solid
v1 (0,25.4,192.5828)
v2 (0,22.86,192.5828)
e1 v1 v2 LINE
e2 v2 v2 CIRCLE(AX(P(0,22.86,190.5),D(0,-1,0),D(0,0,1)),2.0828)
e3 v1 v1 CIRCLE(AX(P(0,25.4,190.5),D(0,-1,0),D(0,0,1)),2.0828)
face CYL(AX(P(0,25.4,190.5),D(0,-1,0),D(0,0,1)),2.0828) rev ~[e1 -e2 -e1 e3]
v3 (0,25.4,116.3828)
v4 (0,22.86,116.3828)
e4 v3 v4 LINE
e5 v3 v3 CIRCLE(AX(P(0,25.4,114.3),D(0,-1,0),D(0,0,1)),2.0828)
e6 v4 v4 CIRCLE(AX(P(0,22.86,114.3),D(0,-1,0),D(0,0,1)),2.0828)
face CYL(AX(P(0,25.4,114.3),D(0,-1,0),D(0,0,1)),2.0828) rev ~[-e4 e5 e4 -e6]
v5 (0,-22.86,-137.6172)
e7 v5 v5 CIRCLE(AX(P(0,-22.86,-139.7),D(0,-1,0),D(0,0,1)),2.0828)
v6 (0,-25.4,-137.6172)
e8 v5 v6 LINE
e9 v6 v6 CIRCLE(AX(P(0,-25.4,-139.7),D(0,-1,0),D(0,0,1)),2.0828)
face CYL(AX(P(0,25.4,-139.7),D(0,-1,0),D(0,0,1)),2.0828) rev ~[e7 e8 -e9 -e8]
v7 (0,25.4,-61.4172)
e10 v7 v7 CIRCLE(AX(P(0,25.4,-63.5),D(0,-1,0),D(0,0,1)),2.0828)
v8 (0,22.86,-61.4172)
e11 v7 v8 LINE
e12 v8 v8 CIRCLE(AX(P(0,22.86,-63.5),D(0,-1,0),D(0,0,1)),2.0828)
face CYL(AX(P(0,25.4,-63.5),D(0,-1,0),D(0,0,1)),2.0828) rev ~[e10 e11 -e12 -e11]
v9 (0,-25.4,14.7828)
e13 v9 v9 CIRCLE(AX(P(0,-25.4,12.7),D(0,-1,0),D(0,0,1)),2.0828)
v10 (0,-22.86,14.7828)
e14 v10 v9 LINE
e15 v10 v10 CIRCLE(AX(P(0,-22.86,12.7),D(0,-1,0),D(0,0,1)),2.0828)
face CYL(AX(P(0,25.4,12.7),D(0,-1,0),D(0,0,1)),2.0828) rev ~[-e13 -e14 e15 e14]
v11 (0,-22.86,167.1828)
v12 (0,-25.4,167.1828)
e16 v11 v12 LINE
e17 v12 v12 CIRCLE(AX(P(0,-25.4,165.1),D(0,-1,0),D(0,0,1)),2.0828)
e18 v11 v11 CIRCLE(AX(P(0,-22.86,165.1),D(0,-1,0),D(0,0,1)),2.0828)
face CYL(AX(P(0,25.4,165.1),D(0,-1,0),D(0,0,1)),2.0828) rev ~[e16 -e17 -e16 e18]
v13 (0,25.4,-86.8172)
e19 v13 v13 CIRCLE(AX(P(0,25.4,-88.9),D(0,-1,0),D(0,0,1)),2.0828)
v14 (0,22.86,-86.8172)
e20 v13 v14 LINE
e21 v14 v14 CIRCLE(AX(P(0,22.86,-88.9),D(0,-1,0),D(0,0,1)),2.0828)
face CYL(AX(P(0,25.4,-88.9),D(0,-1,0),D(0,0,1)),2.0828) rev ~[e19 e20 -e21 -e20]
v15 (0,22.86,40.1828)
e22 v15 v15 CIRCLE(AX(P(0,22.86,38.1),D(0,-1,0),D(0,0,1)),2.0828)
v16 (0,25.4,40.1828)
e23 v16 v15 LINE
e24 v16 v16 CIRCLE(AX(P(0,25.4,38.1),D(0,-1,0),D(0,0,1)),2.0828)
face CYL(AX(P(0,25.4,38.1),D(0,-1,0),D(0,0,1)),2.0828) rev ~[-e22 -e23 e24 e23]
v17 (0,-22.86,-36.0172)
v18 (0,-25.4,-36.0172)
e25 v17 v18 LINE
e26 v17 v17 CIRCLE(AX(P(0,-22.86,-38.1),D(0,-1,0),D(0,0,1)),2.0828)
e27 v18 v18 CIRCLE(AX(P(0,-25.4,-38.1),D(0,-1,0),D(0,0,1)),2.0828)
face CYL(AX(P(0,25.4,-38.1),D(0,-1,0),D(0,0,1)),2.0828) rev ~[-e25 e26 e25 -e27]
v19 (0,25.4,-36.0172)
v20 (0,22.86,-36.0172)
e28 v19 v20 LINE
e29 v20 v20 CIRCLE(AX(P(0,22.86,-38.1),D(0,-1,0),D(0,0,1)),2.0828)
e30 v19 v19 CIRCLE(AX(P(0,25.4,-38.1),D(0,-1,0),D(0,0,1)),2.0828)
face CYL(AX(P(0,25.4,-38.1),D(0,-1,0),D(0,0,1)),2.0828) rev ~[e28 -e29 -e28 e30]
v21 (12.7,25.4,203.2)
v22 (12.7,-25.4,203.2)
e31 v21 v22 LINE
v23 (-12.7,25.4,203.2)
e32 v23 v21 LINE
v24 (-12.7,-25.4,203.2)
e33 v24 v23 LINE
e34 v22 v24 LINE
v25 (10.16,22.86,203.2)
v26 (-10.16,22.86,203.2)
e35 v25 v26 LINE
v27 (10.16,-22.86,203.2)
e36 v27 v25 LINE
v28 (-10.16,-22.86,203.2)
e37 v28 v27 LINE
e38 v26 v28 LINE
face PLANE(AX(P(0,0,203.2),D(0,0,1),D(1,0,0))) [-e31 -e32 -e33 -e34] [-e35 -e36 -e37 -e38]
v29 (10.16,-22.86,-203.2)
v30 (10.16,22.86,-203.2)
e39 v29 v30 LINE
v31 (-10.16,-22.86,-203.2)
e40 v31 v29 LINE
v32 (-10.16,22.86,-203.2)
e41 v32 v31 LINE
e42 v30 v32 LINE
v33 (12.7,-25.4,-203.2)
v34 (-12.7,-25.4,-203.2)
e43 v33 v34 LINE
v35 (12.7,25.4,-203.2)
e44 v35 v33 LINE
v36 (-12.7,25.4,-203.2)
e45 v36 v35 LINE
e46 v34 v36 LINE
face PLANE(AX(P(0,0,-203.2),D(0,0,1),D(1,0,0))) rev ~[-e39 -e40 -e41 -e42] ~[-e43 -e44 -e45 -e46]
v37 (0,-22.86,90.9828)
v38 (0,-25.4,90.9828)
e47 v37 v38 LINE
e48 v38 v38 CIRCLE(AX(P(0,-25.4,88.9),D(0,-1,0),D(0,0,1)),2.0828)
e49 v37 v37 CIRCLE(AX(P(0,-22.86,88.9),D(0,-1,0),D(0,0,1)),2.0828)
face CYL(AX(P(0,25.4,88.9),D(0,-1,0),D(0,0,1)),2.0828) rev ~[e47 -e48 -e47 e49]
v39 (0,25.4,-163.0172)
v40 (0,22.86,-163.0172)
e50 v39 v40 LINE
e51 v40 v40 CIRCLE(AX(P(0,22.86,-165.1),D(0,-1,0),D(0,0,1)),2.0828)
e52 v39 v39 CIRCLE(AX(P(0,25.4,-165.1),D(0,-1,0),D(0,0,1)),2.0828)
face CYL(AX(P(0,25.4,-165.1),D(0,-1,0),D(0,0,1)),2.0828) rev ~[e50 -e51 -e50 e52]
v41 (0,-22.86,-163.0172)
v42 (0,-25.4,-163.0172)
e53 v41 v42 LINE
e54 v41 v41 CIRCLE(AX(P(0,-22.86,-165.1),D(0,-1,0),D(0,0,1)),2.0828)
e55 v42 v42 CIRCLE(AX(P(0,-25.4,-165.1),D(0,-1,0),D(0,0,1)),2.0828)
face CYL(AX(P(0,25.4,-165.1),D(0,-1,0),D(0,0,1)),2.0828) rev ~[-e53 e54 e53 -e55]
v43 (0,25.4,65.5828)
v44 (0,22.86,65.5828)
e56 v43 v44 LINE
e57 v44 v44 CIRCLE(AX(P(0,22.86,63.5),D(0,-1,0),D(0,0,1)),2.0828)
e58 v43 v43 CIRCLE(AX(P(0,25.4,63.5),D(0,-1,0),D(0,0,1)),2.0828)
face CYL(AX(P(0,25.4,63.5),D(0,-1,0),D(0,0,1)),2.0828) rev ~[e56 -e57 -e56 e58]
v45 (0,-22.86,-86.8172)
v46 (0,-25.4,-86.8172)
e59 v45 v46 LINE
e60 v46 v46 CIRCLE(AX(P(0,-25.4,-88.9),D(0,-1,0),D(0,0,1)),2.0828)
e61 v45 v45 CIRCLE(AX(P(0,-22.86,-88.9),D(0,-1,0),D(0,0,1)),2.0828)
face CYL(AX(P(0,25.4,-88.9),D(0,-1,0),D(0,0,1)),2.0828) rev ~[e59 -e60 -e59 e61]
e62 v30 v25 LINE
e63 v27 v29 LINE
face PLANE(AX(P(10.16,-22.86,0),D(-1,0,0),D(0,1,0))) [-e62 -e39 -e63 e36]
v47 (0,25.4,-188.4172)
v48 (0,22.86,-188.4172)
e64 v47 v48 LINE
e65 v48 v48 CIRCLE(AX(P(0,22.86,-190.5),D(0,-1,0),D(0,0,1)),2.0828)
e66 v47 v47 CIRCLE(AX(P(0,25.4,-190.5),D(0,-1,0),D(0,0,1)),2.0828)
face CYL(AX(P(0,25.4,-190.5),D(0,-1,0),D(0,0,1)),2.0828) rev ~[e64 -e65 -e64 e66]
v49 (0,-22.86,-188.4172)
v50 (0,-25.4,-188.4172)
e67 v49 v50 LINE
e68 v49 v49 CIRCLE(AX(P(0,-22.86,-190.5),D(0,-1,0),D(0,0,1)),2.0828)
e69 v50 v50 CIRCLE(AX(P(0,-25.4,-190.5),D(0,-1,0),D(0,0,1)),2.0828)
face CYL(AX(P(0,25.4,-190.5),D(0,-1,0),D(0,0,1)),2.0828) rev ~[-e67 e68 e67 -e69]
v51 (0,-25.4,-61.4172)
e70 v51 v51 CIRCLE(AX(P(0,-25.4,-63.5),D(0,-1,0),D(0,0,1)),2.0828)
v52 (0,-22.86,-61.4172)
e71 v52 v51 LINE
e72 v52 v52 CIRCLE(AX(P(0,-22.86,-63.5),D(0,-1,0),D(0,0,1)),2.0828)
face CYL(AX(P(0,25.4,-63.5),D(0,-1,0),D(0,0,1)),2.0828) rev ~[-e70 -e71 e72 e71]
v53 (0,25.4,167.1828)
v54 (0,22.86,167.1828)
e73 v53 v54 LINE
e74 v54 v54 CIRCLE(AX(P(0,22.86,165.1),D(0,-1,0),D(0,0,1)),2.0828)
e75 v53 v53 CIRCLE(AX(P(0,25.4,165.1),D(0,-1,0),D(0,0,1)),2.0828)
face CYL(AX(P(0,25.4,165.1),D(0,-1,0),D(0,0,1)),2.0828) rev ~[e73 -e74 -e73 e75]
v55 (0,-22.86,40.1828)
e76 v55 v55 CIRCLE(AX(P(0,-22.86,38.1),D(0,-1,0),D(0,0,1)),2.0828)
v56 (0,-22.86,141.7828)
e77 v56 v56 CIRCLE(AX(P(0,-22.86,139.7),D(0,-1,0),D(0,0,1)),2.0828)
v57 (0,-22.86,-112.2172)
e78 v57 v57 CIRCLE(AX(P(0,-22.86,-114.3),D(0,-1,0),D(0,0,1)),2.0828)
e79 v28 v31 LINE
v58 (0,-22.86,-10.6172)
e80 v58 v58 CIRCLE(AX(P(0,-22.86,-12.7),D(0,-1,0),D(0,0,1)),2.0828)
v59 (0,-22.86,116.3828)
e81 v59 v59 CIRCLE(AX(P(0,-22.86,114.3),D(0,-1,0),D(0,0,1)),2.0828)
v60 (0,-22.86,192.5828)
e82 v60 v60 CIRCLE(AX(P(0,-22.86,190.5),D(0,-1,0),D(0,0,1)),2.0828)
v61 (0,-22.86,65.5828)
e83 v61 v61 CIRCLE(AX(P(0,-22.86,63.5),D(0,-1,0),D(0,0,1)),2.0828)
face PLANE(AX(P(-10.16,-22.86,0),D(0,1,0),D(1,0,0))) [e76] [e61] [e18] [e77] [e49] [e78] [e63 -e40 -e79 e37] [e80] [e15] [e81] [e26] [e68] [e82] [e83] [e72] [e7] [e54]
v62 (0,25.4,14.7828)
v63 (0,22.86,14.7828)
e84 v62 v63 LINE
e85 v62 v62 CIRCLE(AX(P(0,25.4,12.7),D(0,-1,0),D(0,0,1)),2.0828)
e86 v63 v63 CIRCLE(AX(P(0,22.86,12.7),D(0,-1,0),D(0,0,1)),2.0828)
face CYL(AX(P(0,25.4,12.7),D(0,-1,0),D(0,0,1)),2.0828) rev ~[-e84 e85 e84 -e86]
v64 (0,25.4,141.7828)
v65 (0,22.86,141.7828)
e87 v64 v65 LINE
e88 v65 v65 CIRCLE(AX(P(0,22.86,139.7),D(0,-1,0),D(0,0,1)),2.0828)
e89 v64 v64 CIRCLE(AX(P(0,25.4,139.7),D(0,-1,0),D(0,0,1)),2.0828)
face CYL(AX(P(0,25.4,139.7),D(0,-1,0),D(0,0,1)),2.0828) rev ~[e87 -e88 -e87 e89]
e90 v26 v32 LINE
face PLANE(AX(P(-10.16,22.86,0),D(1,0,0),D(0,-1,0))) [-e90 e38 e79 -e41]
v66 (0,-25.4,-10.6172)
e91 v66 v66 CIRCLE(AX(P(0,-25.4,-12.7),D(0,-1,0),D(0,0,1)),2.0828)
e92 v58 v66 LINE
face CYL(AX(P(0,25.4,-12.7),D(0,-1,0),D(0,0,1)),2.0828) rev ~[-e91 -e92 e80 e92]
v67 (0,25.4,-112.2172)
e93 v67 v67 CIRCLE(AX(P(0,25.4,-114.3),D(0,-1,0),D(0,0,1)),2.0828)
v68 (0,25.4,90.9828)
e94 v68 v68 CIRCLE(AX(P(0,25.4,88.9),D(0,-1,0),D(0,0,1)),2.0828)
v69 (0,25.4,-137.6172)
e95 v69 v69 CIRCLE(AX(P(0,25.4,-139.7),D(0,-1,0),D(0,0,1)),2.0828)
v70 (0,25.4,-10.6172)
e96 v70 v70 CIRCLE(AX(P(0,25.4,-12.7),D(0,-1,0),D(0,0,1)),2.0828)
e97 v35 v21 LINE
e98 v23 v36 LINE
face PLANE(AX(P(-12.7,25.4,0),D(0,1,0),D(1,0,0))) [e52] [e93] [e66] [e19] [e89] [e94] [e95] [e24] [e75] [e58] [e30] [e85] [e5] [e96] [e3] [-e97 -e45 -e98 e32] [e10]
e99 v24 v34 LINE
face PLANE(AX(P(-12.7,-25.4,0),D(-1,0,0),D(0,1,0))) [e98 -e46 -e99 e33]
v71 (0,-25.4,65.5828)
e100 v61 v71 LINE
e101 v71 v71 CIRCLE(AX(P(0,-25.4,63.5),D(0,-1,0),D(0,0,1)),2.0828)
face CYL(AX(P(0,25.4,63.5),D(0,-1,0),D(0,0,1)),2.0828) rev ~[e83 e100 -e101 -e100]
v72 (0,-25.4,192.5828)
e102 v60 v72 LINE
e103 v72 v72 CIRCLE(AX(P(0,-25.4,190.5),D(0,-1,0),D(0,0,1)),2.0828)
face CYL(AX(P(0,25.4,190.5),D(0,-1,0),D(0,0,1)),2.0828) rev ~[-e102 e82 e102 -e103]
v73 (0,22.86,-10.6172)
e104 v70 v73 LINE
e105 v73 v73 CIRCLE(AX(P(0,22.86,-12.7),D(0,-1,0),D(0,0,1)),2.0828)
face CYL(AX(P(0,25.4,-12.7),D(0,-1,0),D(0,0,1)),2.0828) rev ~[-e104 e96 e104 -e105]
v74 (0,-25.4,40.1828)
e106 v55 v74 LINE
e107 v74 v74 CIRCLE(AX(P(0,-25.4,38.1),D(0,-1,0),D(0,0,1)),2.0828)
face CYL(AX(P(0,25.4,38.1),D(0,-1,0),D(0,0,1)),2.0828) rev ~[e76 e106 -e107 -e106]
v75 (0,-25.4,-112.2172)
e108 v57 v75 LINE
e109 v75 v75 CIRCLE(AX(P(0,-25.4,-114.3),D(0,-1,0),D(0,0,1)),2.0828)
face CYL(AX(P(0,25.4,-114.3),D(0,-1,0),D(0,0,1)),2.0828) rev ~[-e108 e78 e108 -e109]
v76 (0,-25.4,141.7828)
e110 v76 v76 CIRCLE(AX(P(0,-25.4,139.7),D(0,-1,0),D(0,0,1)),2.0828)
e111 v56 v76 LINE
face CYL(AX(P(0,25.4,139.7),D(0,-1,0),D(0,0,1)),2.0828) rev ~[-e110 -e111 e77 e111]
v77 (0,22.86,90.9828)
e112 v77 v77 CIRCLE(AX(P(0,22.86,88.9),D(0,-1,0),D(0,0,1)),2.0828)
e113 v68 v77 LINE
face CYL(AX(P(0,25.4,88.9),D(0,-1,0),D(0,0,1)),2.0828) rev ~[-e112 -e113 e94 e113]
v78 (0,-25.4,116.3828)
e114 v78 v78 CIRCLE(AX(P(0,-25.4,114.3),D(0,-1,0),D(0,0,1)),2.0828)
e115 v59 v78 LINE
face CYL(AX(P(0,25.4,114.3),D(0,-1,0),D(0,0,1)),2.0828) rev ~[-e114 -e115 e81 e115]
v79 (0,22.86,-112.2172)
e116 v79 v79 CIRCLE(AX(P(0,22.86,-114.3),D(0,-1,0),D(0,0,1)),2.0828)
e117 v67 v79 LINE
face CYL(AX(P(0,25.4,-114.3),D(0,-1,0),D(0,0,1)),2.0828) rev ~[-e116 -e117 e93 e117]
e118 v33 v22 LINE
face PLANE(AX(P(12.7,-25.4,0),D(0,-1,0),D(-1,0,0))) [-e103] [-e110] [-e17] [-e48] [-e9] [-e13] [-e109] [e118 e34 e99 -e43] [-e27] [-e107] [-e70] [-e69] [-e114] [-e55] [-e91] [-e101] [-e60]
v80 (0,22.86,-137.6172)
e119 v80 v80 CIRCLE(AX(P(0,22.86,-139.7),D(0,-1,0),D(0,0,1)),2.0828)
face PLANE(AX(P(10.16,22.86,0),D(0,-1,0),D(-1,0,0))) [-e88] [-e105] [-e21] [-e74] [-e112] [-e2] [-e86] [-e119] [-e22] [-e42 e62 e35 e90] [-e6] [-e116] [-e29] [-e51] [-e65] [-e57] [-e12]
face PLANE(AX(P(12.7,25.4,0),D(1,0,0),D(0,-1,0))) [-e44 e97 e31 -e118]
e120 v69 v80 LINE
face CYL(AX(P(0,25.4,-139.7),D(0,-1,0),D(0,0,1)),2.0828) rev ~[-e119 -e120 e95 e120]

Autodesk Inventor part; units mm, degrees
ref_plane "YZ Plane" through (0, 0, 0) normal (1, 0, 0) x (0, 1, 0)
ref_plane "XZ Plane" through (0, 0, 0) normal (0, 1, 0) x (-1, 0, 0)
ref_plane "XY Plane" through (0, 0, 0) normal (0, 0, 1) x (1, 0, 0)
sketch "Sketch1" plane through (0, 0, 0) normal (0, 0, 1) x (1, 0, 0)
  line L0 (12.7, -25.4) -> (-12.7, -25.4)
  line L1 (-12.7, -25.4) -> (-12.7, 25.4)
  line L2 (-12.7, 25.4) -> (12.7, 25.4)
  line L3 (12.7, 25.4) -> (12.7, -25.4)
  line L4 (12.7, -25.4) -> (-12.7, 25.4) construction
  line L5 (-12.7, -25.4) -> (12.7, 25.4) construction
  line L6 (10.16, 22.86) -> (-10.16, 22.86)
  line L7 (-10.16, 22.86) -> (-10.16, -22.86)
  line L8 (-10.16, -22.86) -> (10.16, -22.86)
  line L9 (10.16, -22.86) -> (10.16, 22.86)
  point P0 (0, 0)
  dimension "d0" = 25.4
  dimension "d1" = 50.8
  dimension "d2" = 2.54
extrude "Extrusion1" add sketch "Sketch1" along normal mid plane 406.4
sketch "Sketch2" plane through (-12.7, 25.4, 203.2) normal (0, 1, 0) x (1, 0, 0)
  point P0 (12.7, 203.2)
  point P1 (12.7, 215.9)
  point P2 (12.7, 190.5)
  dimension "HoleOffset" = 12.7
  dimension "d6" = 12.7
hole "Hole1" at (0, 25.4, -12.7) at (0, 25.4, 12.7) direction (0, -1, 0) diameter 4.1656 end through all
pattern_linear "Rectangular Pattern1" count 31 spacing 50.8 along (0, 0, 1) of "Hole1" first direction both ways yes
properties part number "Base Frame Side Rail" material "Aluminum 6061"
